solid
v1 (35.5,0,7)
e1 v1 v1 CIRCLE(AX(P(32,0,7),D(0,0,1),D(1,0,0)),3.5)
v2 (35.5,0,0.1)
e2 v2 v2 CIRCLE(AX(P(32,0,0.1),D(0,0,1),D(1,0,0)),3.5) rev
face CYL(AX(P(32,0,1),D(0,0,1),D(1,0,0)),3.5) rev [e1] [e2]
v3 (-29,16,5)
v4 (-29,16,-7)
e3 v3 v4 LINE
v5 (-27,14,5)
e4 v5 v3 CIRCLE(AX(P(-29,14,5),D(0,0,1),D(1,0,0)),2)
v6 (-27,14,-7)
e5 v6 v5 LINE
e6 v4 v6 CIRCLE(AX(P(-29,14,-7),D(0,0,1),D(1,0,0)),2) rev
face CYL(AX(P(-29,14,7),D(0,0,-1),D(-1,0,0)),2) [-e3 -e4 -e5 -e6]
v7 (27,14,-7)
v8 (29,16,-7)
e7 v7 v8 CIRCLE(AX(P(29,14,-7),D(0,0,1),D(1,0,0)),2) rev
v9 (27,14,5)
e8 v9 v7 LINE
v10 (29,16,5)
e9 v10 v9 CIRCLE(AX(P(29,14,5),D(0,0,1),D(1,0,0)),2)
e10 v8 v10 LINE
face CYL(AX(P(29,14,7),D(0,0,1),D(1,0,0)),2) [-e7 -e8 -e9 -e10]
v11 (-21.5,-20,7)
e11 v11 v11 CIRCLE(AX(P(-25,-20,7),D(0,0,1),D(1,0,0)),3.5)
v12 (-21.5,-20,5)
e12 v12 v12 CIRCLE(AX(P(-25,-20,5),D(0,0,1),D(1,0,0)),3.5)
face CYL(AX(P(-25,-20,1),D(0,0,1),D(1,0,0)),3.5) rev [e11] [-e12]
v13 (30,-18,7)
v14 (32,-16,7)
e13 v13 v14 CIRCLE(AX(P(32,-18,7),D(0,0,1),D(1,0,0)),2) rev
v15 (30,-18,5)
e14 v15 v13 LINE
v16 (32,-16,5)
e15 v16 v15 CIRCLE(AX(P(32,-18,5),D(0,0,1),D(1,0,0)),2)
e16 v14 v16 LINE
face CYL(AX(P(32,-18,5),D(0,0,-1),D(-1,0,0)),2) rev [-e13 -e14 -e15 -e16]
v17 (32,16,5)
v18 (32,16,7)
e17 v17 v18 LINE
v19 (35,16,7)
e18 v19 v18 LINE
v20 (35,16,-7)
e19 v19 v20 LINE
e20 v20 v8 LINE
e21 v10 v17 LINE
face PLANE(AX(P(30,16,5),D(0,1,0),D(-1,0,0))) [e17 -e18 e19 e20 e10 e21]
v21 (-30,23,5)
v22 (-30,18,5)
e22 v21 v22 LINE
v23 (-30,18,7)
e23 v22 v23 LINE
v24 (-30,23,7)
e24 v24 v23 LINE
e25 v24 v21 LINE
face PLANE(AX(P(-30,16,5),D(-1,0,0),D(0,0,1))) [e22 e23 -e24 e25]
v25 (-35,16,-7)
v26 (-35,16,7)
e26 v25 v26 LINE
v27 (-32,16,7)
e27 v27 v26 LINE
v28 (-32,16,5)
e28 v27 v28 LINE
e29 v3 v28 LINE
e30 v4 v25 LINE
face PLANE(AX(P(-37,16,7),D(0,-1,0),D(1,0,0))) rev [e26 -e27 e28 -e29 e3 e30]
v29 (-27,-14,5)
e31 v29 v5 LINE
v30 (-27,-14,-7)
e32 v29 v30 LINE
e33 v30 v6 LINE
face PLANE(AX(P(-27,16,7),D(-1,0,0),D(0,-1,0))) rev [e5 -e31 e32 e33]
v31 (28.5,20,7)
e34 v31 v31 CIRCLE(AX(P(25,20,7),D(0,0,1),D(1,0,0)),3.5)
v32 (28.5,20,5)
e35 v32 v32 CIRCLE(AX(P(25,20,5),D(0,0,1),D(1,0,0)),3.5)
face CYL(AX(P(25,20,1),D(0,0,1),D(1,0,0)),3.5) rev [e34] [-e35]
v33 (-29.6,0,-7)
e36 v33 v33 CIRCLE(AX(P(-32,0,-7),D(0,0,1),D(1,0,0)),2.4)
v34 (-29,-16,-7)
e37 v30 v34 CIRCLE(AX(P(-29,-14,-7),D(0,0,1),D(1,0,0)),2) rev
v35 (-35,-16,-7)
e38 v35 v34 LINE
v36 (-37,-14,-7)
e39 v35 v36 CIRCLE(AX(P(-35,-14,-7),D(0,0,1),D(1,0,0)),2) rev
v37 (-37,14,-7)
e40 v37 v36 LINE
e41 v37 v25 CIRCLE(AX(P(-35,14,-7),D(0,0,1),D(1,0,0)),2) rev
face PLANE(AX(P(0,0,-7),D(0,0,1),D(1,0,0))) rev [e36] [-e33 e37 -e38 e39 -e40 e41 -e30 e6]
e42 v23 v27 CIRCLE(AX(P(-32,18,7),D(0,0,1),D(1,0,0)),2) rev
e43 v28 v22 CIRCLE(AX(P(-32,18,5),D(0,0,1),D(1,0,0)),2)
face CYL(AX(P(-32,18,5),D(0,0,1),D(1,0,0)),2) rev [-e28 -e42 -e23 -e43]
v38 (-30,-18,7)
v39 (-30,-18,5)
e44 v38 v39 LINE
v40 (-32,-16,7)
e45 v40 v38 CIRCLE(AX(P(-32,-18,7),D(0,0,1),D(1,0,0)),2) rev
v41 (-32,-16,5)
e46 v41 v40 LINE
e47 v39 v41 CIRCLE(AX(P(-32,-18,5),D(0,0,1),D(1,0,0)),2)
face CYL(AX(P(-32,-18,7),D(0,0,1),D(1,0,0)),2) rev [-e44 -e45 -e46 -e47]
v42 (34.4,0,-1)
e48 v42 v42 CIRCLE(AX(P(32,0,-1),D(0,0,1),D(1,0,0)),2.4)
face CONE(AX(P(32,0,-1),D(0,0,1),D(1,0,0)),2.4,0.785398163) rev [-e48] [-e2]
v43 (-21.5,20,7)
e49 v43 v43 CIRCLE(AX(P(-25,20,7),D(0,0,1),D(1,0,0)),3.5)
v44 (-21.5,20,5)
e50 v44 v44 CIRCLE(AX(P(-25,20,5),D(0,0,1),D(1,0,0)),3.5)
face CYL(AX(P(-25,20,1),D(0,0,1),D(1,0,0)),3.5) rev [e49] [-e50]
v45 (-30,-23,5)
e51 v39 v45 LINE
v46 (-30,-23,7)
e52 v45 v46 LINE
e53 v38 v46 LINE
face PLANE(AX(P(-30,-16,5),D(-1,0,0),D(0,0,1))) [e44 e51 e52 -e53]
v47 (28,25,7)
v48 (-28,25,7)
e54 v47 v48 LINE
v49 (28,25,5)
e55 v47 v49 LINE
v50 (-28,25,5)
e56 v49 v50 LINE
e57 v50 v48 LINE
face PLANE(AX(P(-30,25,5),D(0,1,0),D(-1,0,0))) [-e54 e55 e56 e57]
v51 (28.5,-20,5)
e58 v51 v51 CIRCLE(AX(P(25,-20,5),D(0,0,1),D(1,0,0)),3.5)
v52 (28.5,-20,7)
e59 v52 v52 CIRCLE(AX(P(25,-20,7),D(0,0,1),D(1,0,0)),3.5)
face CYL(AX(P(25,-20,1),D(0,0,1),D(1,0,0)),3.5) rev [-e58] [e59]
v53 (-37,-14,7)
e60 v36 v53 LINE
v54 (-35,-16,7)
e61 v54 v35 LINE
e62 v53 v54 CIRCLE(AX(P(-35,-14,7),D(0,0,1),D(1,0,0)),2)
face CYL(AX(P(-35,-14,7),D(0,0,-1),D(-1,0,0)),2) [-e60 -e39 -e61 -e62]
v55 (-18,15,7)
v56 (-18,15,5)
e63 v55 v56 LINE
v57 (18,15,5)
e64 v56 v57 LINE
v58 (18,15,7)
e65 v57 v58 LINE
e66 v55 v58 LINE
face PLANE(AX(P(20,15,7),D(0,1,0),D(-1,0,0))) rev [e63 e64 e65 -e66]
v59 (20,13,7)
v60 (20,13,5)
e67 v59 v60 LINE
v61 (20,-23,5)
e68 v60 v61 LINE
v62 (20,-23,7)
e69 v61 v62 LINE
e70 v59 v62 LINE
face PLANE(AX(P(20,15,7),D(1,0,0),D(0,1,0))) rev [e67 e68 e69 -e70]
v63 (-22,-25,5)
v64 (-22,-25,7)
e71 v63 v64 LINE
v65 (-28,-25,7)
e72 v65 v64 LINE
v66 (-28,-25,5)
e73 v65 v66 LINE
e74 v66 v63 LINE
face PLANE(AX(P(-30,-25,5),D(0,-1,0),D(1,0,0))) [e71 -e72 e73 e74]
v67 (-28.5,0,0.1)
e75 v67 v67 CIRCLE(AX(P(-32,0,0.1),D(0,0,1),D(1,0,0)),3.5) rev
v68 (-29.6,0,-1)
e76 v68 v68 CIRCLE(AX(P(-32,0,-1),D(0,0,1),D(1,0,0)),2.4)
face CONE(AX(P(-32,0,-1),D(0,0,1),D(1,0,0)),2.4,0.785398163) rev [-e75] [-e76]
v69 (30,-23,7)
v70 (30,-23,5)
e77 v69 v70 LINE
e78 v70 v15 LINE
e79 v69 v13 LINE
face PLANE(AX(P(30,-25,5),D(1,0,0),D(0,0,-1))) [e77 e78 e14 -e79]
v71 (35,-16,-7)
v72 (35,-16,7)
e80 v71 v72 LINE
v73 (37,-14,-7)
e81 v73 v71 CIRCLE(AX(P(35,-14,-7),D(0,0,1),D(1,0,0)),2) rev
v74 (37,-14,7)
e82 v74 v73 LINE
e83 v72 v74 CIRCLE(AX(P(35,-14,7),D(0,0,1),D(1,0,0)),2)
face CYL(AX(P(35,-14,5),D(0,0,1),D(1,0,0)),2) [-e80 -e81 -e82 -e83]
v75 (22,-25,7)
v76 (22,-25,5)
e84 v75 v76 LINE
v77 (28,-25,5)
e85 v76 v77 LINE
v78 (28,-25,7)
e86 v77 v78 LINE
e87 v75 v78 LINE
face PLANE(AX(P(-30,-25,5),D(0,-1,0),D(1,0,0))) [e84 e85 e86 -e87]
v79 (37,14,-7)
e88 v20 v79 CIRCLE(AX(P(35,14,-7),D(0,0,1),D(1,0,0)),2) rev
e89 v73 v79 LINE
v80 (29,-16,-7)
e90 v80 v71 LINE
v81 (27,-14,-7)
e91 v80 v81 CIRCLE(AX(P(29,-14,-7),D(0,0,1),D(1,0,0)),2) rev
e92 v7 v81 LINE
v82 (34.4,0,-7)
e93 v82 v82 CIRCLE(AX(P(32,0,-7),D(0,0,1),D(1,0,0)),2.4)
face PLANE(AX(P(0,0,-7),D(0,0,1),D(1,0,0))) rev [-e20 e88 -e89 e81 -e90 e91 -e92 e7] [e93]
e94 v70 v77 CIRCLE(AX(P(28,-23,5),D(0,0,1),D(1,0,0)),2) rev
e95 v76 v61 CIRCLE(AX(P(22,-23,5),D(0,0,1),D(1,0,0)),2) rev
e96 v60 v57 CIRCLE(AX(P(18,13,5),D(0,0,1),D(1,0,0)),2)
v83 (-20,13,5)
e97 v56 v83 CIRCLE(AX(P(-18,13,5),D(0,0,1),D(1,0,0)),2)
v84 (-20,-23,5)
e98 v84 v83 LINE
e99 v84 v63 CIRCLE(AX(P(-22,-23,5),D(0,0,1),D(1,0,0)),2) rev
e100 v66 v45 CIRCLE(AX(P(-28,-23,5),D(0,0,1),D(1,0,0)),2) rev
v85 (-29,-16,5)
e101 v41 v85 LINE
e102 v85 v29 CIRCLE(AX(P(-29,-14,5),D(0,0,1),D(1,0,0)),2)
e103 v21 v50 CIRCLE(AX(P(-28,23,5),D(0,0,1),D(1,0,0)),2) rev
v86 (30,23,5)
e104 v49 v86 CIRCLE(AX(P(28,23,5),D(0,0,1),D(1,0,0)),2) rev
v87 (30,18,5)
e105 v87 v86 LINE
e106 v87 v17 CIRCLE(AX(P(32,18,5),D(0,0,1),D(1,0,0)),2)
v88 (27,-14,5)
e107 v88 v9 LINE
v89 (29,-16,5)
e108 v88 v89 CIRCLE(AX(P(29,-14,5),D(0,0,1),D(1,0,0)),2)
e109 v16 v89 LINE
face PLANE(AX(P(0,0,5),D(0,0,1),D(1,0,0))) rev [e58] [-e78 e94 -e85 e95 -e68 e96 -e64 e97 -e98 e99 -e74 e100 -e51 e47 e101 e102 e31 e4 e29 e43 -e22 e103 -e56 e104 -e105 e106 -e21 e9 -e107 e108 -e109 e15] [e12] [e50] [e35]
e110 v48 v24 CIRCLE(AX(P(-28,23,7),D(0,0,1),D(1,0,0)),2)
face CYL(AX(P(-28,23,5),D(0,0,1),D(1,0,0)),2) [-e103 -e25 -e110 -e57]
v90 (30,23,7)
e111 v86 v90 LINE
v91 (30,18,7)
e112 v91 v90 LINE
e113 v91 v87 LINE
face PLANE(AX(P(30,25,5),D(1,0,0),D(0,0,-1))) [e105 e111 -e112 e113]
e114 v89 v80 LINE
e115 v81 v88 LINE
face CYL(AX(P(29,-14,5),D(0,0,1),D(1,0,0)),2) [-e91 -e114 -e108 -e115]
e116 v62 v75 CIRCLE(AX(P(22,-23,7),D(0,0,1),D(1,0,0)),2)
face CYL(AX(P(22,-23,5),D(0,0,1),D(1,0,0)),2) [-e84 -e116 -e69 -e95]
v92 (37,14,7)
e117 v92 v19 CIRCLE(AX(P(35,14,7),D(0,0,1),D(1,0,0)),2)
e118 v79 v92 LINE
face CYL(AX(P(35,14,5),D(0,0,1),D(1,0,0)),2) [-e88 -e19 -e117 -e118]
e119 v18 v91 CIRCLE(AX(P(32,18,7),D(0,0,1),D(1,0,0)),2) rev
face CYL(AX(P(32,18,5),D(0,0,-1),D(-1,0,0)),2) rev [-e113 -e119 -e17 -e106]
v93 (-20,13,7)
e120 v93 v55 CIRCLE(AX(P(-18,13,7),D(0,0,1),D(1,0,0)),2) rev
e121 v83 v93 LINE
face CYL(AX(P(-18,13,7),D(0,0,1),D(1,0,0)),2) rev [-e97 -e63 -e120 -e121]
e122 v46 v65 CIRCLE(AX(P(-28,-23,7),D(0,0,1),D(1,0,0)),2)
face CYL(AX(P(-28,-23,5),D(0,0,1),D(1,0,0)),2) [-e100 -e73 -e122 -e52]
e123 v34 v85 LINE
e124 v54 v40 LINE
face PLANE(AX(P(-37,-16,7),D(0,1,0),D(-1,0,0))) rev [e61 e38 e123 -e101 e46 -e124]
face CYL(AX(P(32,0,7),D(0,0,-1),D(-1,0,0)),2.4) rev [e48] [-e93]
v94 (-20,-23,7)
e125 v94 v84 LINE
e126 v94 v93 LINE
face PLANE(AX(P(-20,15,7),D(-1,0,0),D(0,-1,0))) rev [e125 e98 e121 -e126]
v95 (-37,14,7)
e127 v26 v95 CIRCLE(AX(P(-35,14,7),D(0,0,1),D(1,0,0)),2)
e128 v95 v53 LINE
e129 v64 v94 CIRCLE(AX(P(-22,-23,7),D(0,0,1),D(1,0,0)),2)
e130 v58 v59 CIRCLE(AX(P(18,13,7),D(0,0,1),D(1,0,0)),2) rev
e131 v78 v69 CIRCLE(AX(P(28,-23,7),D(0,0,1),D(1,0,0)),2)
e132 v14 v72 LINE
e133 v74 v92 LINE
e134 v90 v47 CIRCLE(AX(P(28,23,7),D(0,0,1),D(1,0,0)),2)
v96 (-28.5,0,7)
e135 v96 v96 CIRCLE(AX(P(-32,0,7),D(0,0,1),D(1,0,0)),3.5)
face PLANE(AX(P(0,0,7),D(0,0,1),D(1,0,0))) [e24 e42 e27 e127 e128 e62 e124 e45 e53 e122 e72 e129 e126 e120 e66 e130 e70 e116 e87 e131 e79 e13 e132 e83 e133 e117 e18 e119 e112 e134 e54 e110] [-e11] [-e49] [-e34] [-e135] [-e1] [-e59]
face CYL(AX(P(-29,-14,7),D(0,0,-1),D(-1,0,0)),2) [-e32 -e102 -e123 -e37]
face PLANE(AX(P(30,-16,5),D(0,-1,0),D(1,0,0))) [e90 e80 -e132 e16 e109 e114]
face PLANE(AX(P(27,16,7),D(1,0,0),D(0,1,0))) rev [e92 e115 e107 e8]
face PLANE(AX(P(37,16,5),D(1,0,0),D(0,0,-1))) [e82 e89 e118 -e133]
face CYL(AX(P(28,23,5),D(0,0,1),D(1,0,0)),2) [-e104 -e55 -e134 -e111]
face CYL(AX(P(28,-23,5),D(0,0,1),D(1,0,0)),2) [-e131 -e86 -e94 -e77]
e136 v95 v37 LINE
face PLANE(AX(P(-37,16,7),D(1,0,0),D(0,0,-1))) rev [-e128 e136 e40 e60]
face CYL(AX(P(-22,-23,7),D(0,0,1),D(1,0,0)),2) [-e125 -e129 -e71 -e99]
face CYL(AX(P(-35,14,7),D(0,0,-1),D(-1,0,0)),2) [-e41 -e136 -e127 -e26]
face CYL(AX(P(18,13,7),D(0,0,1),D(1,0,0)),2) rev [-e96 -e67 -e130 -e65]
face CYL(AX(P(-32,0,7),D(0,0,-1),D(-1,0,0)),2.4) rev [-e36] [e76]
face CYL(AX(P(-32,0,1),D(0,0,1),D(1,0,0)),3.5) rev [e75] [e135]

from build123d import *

# Parameters (mm, degrees)
SKETCH1_W             = 10
SKETCH1_H             = 32
SKETCH1_R             = 2.4
BOSS_EXTRUDE1_DEPTH   = 7
BOSS_EXTRUDE1_2_DEPTH = 7
SKETCH3_R             = 1.6
BOSS_EXTRUDE2_DEPTH   = 2
SKETCH2_R             = 3.5
CUT_EXTRUDE2_DEPTH    = 6
SKETCH4_W             = 40
SKETCH4_H             = 40
CUT_EXTRUDE3_DEPTH    = 47.238512087
FILLET1_R             = 2
CHAMFER1_SIZE         = 2


with BuildPart() as part:
    # Sketch1 → Boss-Extrude1 (new, symmetric)
    with BuildSketch(Plane.XY):
        with Locations((-32, 0)):
            Rectangle(SKETCH1_W, SKETCH1_H)
        with Locations((-32, 0)):
            Circle(SKETCH1_R, mode=Mode.SUBTRACT)
    extrude(amount=BOSS_EXTRUDE1_DEPTH, both=True)



with BuildPart() as body_2:
    # Sketch1 → Boss-Extrude1 2 (new, symmetric)
    with BuildSketch(Plane.XY):
        with Locations((32, 0)):
            Rectangle(SKETCH1_W, SKETCH1_H)
        with Locations((32, 0)):
            Circle(SKETCH1_R, mode=Mode.SUBTRACT)
    extrude(amount=BOSS_EXTRUDE1_2_DEPTH, both=True)


with BuildPart() as part_1:
    add(part.part)

    add(body_2.part)  # Boss-Extrude2 merges body 2
    # Sketch3 → Boss-Extrude2 (add)
    with BuildSketch(Plane.XY.offset(7)):
        Polygon((-37, 16), (-30, 16), (-30, 25), (30, 25), (30, 16), (37, 16), (37, -16), (30, -16), (30, -25), (-30, -25), (-30, -16), (-37, -16), align=None)
        with Locations((-25, 20)):
            Circle(SKETCH3_R, mode=Mode.SUBTRACT)
        with Locations((25, 20)):
            Circle(SKETCH3_R, mode=Mode.SUBTRACT)
        with Locations((25, -20)):
            Circle(SKETCH3_R, mode=Mode.SUBTRACT)
        with Locations((-25, -20)):
            Circle(SKETCH3_R, mode=Mode.SUBTRACT)
    extrude(amount=-BOSS_EXTRUDE2_DEPTH)

    # Sketch2 → Cut-Extrude2 (cut)
    with BuildSketch(Plane.XY.offset(7)):
        with Locations((-32, 0)):
            Circle(SKETCH2_R)
        with Locations((32, 0)):
            Circle(SKETCH2_R)
        with Locations((-25, 20)):
            Circle(SKETCH2_R)
        with Locations((25, 20)):
            Circle(SKETCH2_R)
        with Locations((25, -20)):
            Circle(SKETCH2_R)
        with Locations((-25, -20)):
            Circle(SKETCH2_R)
    extrude(amount=-CUT_EXTRUDE2_DEPTH, mode=Mode.SUBTRACT)

    # Sketch4 → Cut-Extrude3 (cut, through all)
    with BuildSketch(Plane(origin=(0, 0, 5), x_dir=(-1, 0, 0), z_dir=(0, 0, -1))):
        with Locations((0, -5)):
            Rectangle(SKETCH4_W, SKETCH4_H)
    extrude(amount=-CUT_EXTRUDE3_DEPTH, mode=Mode.SUBTRACT)

    # Fillet1
    fillet1_edges = [part_1.edges().sort_by_distance(p)[0] for p in [
        (20, -25, 6),
        (20, 15, 6),
        (-20, 15, 6),
        (-20, -25, 6),
        (-27, 16, -1),
        (-27, -16, -1),
        (-30, 16, 6),
        (-30, 25, 6),
        (30, 25, 6),
        (30, 16, 6),
        (37, 16, 0),
        (37, -16, 0),
        (30, -16, 6),
        (30, -25, 6),
        (-30, -25, 6),
        (-30, -16, 6),
        (27, 16, -1),
        (27, -16, -1),
        (-37, 16, 0),
        (-37, -16, 0),
    ]]
    fillet(fillet1_edges, radius=FILLET1_R)

    # Chamfer1
    # the kernel refuses this chamfer: 2 mm, written as the material it takes off along each edge
    with BuildSketch(Plane(origin=(-32, 0, 1), x_dir=(1, 0, 0), z_dir=(0, 1, 0))) as chamfer1_piece_1_section:
        Polygon((2.4 + CHAMFER1_SIZE, 0), (2.4, CHAMFER1_SIZE), (2.4, 0), align=None)
    chamfer1_piece_1 = revolve(axis=Axis((-32, 0, 1), (0, 0, -1)), mode=Mode.PRIVATE)
    chamfer1_piece_1 = chamfer1_piece_1 & Plane(origin=(-32, 0, -0.456047854), x_dir=(1, 0, 0), z_dir=(0, 0, 1)) * Cylinder(3.5, 18, mode=Mode.PRIVATE)
    add(chamfer1_piece_1, mode=Mode.SUBTRACT)
    with BuildSketch(Plane(origin=(32, 0, 1), x_dir=(1, 0, 0), z_dir=(0, 1, 0))) as chamfer1_piece_2_section:
        Polygon((2.4, CHAMFER1_SIZE), (2.4 + CHAMFER1_SIZE, 0), (2.4, 0), align=None)
    chamfer1_piece_2 = revolve(axis=Axis((32, 0, 1), (0, 0, -1)), mode=Mode.PRIVATE)
    chamfer1_piece_2 = chamfer1_piece_2 & Plane(origin=(32, 0, -0.456047854), x_dir=(1, 0, 0), z_dir=(0, 0, 1)) * Cylinder(3.5, 18, mode=Mode.PRIVATE)
    add(chamfer1_piece_2, mode=Mode.SUBTRACT)


solid = part_1.part
